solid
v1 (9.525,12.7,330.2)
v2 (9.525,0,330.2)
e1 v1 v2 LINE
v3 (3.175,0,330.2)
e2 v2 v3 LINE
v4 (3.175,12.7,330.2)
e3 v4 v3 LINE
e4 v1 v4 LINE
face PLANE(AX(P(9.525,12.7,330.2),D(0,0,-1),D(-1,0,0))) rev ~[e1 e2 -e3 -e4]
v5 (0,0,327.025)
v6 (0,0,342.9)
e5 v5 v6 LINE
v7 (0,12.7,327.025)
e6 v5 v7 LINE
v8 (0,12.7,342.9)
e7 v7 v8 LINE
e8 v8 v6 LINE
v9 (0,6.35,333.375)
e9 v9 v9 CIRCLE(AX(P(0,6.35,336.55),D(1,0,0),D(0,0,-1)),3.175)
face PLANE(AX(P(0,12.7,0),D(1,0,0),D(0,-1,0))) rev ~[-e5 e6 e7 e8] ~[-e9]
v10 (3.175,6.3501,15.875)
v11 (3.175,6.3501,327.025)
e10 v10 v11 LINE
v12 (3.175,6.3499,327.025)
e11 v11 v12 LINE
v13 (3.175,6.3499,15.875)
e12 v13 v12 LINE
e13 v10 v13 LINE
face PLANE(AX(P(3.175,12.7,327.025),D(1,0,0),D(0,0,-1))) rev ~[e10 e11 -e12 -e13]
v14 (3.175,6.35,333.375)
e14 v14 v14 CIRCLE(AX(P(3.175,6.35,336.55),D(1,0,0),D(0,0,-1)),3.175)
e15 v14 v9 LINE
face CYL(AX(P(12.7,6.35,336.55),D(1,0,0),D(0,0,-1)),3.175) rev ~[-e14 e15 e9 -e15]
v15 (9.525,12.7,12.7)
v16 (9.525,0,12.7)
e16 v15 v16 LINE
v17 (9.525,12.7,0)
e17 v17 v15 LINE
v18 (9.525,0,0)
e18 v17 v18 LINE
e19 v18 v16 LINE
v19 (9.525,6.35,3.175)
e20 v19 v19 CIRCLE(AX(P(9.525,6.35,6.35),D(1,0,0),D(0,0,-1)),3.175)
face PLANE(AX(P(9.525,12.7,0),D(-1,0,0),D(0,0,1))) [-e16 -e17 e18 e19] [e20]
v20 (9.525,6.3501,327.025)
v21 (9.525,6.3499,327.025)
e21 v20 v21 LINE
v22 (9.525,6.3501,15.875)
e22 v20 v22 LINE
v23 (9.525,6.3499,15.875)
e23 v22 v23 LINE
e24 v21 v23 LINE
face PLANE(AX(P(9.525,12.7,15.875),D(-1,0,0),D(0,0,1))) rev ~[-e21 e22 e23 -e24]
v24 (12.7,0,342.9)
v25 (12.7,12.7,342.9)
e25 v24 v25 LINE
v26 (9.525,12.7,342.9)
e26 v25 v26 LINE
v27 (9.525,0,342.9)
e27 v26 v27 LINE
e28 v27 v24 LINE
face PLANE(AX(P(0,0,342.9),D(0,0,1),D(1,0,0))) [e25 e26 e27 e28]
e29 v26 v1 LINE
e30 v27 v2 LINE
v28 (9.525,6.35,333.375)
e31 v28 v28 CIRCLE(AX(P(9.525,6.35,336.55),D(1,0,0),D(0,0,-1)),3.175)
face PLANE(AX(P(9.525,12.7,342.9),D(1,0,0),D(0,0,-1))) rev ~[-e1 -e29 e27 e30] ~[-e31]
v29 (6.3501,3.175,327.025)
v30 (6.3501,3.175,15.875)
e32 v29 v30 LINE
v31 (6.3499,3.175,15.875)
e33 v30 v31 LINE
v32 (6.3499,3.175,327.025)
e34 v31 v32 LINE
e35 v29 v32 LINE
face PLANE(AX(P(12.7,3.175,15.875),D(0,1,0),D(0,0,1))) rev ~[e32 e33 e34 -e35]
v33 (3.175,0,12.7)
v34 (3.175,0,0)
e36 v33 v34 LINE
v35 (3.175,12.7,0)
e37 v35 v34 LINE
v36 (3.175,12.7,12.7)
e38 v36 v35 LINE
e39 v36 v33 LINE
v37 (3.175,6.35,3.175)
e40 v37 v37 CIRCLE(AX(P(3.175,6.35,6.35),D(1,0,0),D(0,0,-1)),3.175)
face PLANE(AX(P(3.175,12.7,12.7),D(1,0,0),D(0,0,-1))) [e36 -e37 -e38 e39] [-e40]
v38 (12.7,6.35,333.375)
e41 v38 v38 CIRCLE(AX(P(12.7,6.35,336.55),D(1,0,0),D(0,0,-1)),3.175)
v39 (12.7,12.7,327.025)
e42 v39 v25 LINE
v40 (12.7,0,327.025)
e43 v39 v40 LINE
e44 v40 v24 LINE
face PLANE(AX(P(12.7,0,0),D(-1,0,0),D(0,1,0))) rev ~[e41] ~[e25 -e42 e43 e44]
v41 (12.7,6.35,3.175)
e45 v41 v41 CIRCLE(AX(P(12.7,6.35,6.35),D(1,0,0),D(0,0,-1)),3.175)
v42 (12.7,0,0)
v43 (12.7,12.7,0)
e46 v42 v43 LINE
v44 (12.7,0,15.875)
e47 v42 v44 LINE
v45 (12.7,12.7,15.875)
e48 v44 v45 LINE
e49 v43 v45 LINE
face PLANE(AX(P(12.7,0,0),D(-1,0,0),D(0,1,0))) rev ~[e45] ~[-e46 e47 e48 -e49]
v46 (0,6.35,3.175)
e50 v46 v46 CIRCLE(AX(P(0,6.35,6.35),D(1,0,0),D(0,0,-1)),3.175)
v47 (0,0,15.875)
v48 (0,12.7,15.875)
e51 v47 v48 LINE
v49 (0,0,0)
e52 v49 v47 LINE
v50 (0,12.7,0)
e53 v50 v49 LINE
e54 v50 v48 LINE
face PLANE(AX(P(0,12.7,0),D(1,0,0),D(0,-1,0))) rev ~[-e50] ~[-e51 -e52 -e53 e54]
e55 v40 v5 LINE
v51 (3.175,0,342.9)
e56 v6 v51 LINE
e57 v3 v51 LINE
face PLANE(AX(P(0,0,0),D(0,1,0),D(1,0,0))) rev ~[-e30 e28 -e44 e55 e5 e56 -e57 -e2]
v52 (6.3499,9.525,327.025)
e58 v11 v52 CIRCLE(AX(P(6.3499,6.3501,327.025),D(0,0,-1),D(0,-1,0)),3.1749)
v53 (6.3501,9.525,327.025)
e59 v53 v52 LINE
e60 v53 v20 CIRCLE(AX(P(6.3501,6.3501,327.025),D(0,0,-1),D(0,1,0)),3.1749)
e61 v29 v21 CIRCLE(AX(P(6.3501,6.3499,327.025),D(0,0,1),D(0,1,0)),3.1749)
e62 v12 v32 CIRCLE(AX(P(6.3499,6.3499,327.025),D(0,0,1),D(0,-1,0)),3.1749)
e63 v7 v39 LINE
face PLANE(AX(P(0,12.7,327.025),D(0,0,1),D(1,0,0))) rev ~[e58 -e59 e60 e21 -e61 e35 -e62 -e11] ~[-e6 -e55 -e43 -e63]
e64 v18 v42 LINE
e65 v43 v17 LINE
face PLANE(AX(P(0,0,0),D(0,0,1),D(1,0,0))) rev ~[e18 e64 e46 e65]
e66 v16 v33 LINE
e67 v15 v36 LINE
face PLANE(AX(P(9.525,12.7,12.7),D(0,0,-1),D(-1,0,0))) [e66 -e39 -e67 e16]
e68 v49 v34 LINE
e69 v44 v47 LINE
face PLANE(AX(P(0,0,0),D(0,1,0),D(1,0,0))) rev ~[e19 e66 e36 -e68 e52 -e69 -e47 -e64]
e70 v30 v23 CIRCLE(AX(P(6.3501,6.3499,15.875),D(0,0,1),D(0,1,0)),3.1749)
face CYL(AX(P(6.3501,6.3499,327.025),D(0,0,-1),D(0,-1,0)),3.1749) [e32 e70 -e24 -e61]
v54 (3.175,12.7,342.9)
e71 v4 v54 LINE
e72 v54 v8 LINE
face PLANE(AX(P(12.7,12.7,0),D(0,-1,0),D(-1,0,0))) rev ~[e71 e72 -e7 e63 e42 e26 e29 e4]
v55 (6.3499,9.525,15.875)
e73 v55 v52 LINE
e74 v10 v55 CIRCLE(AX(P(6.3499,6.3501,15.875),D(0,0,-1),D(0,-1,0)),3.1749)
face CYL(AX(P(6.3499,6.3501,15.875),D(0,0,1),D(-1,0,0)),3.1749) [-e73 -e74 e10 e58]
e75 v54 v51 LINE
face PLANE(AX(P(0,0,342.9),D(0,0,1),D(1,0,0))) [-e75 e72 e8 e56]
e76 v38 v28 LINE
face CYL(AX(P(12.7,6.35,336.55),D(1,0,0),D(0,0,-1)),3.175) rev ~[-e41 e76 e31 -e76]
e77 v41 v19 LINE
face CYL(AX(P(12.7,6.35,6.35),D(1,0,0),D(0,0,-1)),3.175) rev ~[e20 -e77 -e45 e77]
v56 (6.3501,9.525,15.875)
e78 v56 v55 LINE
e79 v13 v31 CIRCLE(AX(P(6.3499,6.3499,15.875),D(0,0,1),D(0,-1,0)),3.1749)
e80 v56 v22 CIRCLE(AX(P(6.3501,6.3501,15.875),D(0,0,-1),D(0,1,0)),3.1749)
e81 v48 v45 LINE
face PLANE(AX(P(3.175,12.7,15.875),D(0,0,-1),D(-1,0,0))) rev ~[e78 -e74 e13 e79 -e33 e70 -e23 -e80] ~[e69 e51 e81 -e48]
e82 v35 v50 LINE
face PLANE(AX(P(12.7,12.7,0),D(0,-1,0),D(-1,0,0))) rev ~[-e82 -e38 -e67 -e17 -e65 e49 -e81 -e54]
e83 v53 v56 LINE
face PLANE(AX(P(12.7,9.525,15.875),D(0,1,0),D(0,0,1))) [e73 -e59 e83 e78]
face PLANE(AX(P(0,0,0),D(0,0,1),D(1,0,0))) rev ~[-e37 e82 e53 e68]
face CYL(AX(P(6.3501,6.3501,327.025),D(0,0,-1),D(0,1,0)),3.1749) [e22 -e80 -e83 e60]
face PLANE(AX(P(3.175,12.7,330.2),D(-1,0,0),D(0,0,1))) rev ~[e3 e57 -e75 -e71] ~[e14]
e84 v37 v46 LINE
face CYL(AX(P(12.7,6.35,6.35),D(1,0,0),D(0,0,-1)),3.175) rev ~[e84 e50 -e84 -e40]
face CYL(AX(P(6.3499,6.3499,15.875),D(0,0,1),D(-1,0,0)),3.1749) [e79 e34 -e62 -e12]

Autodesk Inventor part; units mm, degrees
ref_plane "YZ Plane" through (0, 0, 0) normal (1, 0, 0) x (0, 1, 0)
ref_plane "XZ Plane" through (0, 0, 0) normal (0, 1, 0) x (-1, 0, 0)
ref_plane "XY Plane" through (0, 0, 0) normal (0, 0, 1) x (1, 0, 0)
sketch "Sketch1" plane through (0, 0, 0) normal (0, 0, 1) x (1, 0, 0)
  line L0 (0, 0) -> (12.7, 0)
  line L1 (12.7, 0) -> (12.7, 12.7)
  line L2 (12.7, 12.7) -> (0, 12.7)
  line L3 (0, 12.7) -> (0, 0)
  dimension "d0" = 12.7
  dimension "d1" = 12.7
extrude "Extrusion1" add sketch "Sketch1" along normal blind 342.9
sketch "Sketch2" plane through (12.7, 12.7, 342.9) normal (0, 1, 0) x (1, 0, 0)
  line L0 (-12.7, 0) -> (0, 0) projected
  line L1 (0, 342.9) -> (0, 0) projected
  line L2 (0, 342.9) -> (-12.7, 342.9) projected
  line L3 (-12.7, 342.9) -> (-12.7, 0) projected
  line L4 (-12.7, 15.875) -> (-9.525, 15.875)
  line L5 (-9.525, 15.875) -> (-9.525, 327.025)
  line L6 (-9.525, 327.025) -> (-12.7, 327.025)
  line L7 (-12.7, 327.025) -> (-12.7, 15.875)
  line L8 (0, 327.025) -> (-3.175, 327.025)
  line L9 (-3.175, 327.025) -> (-3.175, 15.875)
  line L10 (-3.175, 15.875) -> (0, 15.875)
  line L11 (0, 15.875) -> (0, 327.025)
  line L12 (-9.525, 342.9) -> (-3.175, 342.9)
  line L13 (-3.175, 342.9) -> (-3.175, 330.2)
  line L14 (-3.175, 330.2) -> (-9.525, 330.2)
  line L15 (-9.525, 330.2) -> (-9.525, 342.9)
  line L16 (-9.525, 0) -> (-3.175, 0)
  line L17 (-3.175, 0) -> (-3.175, 12.7)
  line L18 (-3.175, 12.7) -> (-9.525, 12.7)
  line L19 (-9.525, 12.7) -> (-9.525, 0)
  dimension "d4" = 15.875
  dimension "d5" = 6.35
  dimension "d6" = 15.875
  dimension "d7" = 12.7
  dimension "d8" = 12.7
extrude "Extrusion2" cut sketch "Sketch2" against normal through all contours L19 L18 L17 L0 | L3 L6 L5 L4 | L10 L9 L8 L1 | L2 L13 L14 L15
sketch "Sketch3" plane through (12.7, 0, 342.9) normal (1, 0, 0) x (0, 0, -1)
  line L0 (15.875, 12.7) -> (0, 12.7) projected
  line L1 (0, 12.7) -> (0, 0) projected
  line L2 (327.025, 12.7) -> (327.025, 0) projected
  line L3 (342.9, 0) -> (327.025, 0) projected
  line L4 (342.9, 0) -> (342.9, 12.7) projected
  line L5 (342.9, 12.7) -> (327.025, 12.7) projected
  line L6 (327.025, 0) -> (15.875, 0) projected
  line L7 (327.025, 12.7) -> (327.025, 0) projected
  line L8 (15.875, 12.7) -> (327.025, 12.7) projected
  line L9 (15.875, 12.7) -> (15.875, 0) projected
  line L10 (15.875, 12.7) -> (327.025, 12.7)
  line L11 (327.025, 12.7) -> (327.025, 9.525)
  line L12 (327.025, 9.525) -> (15.875, 9.525)
  line L13 (15.875, 9.525) -> (15.875, 12.7)
  line L14 (327.025, 3.175) -> (15.875, 3.175)
  line L15 (15.875, 3.175) -> (15.875, 0)
  line L16 (15.875, 0) -> (327.025, 0)
  line L17 (327.025, 0) -> (327.025, 3.175)
  circle A0 centre (6.35, 6.35) radius 3.175
  circle A1 centre (336.55, 6.35) radius 3.175
  point P0 (342.9, 0)
  dimension "d11" = 6.35
  dimension "d12" = 6.35
  dimension "d13" = 6.35
  dimension "d14" = 6.35
  dimension "d15" = 3.175
  dimension "d16" = 6.35
  dimension "d17" = 6.35
  dimension "d18" = 6.35
extrude "Extrusion3" cut sketch "Sketch3" against normal through all contours L2 L12 L9 L8 | L2 L6 L9 L14 | A0 | A1
fillet "Fillet1" radius 3.175 4 edges at (9.525, 9.525, 171.45) (3.175, 9.525, 171.45) (3.175, 3.175, 171.45) (9.525, 3.175, 171.45)
equation "\"d1\" = d0"
equation "\"d13\" = d12"
equation "\"d17\" = d16"
equation "\"d18\" = d17"
properties part number "8 ball manipulator piston"
